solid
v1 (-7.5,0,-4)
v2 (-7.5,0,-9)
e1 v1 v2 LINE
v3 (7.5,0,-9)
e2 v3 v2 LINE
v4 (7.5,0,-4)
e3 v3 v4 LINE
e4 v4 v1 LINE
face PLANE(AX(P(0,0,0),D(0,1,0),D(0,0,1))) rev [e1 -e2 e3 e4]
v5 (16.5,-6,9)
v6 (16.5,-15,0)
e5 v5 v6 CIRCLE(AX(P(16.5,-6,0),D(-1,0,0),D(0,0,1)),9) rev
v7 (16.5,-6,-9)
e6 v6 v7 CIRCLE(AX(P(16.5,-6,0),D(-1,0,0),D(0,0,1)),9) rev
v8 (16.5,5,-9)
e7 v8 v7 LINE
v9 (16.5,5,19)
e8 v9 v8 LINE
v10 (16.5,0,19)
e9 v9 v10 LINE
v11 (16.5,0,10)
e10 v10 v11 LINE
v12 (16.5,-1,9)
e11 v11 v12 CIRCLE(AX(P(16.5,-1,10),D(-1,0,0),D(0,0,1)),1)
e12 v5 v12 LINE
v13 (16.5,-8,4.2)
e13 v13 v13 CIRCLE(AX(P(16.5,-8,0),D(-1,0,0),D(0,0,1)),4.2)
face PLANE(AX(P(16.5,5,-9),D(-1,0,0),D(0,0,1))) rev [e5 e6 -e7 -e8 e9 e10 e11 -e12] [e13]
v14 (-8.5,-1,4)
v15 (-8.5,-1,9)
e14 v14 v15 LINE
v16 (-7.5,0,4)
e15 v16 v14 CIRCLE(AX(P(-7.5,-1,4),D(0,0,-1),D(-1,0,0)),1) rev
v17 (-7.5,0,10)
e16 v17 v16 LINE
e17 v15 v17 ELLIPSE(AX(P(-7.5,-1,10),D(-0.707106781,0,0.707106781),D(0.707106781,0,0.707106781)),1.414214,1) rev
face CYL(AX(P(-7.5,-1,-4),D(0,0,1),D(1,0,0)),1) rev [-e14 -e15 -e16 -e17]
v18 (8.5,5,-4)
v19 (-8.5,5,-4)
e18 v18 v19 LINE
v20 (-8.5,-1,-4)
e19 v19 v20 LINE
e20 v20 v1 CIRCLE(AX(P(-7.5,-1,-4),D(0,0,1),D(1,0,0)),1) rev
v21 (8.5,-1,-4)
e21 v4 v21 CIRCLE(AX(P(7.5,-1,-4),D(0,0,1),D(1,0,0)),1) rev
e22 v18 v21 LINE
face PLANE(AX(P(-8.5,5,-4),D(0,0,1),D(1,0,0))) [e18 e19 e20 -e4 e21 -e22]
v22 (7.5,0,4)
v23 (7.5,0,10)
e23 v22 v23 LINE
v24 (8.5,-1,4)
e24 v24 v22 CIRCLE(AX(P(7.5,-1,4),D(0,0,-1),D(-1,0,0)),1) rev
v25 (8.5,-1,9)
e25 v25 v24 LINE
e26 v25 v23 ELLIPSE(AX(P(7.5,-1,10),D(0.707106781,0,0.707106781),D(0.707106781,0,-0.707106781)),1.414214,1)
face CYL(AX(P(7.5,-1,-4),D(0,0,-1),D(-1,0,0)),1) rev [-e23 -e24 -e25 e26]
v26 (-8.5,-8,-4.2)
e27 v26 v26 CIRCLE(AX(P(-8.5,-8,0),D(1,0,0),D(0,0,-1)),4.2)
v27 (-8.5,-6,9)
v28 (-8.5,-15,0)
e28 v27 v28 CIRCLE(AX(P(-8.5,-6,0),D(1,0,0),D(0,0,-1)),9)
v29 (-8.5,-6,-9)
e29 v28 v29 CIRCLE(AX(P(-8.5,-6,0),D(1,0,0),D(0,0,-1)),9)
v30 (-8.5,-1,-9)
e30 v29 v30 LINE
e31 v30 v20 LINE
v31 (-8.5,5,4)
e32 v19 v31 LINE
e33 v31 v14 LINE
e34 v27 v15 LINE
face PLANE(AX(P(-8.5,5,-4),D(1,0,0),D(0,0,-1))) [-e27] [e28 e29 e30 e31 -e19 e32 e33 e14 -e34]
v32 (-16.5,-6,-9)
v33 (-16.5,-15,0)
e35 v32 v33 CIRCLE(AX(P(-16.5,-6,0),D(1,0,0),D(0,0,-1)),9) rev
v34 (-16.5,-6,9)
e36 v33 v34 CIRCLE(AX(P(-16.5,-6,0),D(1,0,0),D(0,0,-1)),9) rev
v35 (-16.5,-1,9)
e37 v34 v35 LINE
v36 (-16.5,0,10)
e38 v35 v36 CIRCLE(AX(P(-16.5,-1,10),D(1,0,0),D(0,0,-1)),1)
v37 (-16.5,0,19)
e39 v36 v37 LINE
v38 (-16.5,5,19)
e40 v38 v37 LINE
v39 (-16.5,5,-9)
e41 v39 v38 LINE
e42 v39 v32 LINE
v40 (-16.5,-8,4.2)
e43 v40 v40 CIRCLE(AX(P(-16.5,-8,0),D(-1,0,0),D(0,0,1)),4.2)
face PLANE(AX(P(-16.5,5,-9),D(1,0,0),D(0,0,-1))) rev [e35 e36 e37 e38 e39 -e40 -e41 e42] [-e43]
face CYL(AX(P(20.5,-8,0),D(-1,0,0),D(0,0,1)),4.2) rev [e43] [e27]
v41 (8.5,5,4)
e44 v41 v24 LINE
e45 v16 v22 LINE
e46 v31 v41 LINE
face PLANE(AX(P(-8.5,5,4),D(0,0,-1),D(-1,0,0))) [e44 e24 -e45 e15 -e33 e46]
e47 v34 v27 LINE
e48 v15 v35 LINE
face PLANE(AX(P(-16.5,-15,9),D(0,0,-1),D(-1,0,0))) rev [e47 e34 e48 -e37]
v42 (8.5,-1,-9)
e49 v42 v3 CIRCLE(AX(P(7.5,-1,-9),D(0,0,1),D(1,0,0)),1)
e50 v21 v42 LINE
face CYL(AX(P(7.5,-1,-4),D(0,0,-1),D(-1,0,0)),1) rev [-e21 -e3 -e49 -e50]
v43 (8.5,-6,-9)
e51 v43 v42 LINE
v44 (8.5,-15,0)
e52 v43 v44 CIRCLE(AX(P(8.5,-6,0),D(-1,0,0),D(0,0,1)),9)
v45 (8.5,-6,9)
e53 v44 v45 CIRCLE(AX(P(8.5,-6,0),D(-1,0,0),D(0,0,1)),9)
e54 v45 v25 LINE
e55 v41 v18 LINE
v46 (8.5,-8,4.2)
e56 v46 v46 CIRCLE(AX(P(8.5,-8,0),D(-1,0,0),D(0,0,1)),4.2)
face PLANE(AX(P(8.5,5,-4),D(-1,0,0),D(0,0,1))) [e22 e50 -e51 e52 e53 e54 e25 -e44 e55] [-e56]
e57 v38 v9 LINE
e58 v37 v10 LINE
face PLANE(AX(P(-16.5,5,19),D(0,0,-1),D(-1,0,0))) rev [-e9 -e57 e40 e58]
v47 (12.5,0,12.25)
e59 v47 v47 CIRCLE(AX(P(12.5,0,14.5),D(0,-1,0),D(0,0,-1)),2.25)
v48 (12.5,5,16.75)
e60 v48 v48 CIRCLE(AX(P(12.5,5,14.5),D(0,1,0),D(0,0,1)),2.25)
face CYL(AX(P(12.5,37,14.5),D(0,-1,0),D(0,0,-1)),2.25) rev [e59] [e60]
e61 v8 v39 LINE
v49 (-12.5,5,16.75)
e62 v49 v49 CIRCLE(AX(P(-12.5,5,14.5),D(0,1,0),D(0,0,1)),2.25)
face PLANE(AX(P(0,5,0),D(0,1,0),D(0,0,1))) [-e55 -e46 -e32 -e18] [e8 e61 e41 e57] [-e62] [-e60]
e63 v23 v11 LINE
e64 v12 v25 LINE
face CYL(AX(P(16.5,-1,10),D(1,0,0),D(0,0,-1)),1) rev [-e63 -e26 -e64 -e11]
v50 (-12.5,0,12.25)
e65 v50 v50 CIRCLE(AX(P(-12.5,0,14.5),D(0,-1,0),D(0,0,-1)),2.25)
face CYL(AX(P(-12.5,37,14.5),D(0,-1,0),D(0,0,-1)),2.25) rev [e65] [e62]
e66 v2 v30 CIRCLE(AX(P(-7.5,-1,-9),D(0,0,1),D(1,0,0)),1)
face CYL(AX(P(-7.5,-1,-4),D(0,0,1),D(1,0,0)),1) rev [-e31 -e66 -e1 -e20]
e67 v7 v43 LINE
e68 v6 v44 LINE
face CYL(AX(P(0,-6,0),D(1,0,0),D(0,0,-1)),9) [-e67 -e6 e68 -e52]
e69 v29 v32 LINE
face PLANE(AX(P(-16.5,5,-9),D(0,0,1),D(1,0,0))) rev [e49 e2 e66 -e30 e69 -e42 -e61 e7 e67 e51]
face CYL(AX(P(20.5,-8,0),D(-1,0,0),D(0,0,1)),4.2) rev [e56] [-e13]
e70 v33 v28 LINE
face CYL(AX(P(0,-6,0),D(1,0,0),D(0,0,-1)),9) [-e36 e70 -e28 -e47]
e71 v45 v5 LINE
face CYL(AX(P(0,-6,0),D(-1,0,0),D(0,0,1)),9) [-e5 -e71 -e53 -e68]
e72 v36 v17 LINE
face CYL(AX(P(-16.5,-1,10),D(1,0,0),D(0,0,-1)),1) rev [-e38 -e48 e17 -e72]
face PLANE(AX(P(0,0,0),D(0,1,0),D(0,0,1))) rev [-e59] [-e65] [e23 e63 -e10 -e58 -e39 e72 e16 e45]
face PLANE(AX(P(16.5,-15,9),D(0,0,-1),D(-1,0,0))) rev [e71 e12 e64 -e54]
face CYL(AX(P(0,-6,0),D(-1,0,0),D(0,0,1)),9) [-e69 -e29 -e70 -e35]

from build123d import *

# Parameters (mm, degrees)
SKETCH_1_W          = 33
SKETCH_1_H          = 28
SKETCH_1_W_2        = 17
SKETCH_1_H_2        = 8
EXTRUDE_1_DEPTH     = 5
SKETCH_2_W          = 8
SKETCH_2_H          = 18
EXTRUDE_2_DEPTH     = 15
SKETCH_3_R          = 4.2
CUT_EXTRUDE_1_DEPTH = 37
FILLET_1_R          = 9
FILLET_2_R          = 1
SKETCH_4_R          = 2.25
CUT_EXTRUDE_2_DEPTH = 37


with BuildPart() as part:
    # 草图1 → 凸台-拉伸1 (new body)
    with BuildSketch(Plane(origin=(0, 0, 0), x_dir=(1, 0, 0), z_dir=(0, 1, 0))):
        with Locations((0, -5)):
            Rectangle(SKETCH_1_W, SKETCH_1_H)
        Rectangle(SKETCH_1_W_2, SKETCH_1_H_2, mode=Mode.SUBTRACT)
    extrude(amount=EXTRUDE_1_DEPTH)

    # 草图2 → 凸台-拉伸2 (add)
    with BuildSketch(Plane.XZ):
        with Locations((-12.5, 0)):
            Rectangle(SKETCH_2_W, SKETCH_2_H)
        with Locations((12.5, 0)):
            Rectangle(SKETCH_2_W, SKETCH_2_H)
    extrude(amount=EXTRUDE_2_DEPTH)

    # 草图3 → 切除-拉伸1 (cut)
    with BuildSketch(Plane.ZY.offset(16.5)):
        with Locations((0, -8)):
            Circle(SKETCH_3_R)
    extrude(amount=-CUT_EXTRUDE_1_DEPTH, mode=Mode.SUBTRACT)

    # 圆角1
    fillet_1_edges = [part.edges().sort_by_distance(p)[0] for p in [
        (12.5, -15, -9),
        (12.5, -15, 9),
        (-12.5, -15, 9),
        (-12.5, -15, -9),
    ]]
    fillet(fillet_1_edges, radius=FILLET_1_R - 0.0001)  # a hair under: the kernel refuses the full size

    # 圆角2
    fillet_2_edges = [part.edges().sort_by_distance(p)[0] for p in [
        (-8.5, 0, 6.5),
        (-8.5, 0, -6.5),
        (-12.5, 0, 9),
        (12.5, 0, 9),
        (8.5, 0, 6.5),
        (8.5, 0, -6.5),
    ]]
    fillet(fillet_2_edges, radius=FILLET_2_R)

    # 草图4 → 切除-拉伸2 (cut)
    with BuildSketch(Plane.XZ):
        with Locations(Location((-12.5, 14.5, 0), (0, 0, 270))):
            Circle(SKETCH_4_R)
        with Locations(Location((12.5, 14.5, 0), (0, 0, 270))):
            Circle(SKETCH_4_R)
    extrude(amount=-CUT_EXTRUDE_2_DEPTH, mode=Mode.SUBTRACT)


solid = part.part
